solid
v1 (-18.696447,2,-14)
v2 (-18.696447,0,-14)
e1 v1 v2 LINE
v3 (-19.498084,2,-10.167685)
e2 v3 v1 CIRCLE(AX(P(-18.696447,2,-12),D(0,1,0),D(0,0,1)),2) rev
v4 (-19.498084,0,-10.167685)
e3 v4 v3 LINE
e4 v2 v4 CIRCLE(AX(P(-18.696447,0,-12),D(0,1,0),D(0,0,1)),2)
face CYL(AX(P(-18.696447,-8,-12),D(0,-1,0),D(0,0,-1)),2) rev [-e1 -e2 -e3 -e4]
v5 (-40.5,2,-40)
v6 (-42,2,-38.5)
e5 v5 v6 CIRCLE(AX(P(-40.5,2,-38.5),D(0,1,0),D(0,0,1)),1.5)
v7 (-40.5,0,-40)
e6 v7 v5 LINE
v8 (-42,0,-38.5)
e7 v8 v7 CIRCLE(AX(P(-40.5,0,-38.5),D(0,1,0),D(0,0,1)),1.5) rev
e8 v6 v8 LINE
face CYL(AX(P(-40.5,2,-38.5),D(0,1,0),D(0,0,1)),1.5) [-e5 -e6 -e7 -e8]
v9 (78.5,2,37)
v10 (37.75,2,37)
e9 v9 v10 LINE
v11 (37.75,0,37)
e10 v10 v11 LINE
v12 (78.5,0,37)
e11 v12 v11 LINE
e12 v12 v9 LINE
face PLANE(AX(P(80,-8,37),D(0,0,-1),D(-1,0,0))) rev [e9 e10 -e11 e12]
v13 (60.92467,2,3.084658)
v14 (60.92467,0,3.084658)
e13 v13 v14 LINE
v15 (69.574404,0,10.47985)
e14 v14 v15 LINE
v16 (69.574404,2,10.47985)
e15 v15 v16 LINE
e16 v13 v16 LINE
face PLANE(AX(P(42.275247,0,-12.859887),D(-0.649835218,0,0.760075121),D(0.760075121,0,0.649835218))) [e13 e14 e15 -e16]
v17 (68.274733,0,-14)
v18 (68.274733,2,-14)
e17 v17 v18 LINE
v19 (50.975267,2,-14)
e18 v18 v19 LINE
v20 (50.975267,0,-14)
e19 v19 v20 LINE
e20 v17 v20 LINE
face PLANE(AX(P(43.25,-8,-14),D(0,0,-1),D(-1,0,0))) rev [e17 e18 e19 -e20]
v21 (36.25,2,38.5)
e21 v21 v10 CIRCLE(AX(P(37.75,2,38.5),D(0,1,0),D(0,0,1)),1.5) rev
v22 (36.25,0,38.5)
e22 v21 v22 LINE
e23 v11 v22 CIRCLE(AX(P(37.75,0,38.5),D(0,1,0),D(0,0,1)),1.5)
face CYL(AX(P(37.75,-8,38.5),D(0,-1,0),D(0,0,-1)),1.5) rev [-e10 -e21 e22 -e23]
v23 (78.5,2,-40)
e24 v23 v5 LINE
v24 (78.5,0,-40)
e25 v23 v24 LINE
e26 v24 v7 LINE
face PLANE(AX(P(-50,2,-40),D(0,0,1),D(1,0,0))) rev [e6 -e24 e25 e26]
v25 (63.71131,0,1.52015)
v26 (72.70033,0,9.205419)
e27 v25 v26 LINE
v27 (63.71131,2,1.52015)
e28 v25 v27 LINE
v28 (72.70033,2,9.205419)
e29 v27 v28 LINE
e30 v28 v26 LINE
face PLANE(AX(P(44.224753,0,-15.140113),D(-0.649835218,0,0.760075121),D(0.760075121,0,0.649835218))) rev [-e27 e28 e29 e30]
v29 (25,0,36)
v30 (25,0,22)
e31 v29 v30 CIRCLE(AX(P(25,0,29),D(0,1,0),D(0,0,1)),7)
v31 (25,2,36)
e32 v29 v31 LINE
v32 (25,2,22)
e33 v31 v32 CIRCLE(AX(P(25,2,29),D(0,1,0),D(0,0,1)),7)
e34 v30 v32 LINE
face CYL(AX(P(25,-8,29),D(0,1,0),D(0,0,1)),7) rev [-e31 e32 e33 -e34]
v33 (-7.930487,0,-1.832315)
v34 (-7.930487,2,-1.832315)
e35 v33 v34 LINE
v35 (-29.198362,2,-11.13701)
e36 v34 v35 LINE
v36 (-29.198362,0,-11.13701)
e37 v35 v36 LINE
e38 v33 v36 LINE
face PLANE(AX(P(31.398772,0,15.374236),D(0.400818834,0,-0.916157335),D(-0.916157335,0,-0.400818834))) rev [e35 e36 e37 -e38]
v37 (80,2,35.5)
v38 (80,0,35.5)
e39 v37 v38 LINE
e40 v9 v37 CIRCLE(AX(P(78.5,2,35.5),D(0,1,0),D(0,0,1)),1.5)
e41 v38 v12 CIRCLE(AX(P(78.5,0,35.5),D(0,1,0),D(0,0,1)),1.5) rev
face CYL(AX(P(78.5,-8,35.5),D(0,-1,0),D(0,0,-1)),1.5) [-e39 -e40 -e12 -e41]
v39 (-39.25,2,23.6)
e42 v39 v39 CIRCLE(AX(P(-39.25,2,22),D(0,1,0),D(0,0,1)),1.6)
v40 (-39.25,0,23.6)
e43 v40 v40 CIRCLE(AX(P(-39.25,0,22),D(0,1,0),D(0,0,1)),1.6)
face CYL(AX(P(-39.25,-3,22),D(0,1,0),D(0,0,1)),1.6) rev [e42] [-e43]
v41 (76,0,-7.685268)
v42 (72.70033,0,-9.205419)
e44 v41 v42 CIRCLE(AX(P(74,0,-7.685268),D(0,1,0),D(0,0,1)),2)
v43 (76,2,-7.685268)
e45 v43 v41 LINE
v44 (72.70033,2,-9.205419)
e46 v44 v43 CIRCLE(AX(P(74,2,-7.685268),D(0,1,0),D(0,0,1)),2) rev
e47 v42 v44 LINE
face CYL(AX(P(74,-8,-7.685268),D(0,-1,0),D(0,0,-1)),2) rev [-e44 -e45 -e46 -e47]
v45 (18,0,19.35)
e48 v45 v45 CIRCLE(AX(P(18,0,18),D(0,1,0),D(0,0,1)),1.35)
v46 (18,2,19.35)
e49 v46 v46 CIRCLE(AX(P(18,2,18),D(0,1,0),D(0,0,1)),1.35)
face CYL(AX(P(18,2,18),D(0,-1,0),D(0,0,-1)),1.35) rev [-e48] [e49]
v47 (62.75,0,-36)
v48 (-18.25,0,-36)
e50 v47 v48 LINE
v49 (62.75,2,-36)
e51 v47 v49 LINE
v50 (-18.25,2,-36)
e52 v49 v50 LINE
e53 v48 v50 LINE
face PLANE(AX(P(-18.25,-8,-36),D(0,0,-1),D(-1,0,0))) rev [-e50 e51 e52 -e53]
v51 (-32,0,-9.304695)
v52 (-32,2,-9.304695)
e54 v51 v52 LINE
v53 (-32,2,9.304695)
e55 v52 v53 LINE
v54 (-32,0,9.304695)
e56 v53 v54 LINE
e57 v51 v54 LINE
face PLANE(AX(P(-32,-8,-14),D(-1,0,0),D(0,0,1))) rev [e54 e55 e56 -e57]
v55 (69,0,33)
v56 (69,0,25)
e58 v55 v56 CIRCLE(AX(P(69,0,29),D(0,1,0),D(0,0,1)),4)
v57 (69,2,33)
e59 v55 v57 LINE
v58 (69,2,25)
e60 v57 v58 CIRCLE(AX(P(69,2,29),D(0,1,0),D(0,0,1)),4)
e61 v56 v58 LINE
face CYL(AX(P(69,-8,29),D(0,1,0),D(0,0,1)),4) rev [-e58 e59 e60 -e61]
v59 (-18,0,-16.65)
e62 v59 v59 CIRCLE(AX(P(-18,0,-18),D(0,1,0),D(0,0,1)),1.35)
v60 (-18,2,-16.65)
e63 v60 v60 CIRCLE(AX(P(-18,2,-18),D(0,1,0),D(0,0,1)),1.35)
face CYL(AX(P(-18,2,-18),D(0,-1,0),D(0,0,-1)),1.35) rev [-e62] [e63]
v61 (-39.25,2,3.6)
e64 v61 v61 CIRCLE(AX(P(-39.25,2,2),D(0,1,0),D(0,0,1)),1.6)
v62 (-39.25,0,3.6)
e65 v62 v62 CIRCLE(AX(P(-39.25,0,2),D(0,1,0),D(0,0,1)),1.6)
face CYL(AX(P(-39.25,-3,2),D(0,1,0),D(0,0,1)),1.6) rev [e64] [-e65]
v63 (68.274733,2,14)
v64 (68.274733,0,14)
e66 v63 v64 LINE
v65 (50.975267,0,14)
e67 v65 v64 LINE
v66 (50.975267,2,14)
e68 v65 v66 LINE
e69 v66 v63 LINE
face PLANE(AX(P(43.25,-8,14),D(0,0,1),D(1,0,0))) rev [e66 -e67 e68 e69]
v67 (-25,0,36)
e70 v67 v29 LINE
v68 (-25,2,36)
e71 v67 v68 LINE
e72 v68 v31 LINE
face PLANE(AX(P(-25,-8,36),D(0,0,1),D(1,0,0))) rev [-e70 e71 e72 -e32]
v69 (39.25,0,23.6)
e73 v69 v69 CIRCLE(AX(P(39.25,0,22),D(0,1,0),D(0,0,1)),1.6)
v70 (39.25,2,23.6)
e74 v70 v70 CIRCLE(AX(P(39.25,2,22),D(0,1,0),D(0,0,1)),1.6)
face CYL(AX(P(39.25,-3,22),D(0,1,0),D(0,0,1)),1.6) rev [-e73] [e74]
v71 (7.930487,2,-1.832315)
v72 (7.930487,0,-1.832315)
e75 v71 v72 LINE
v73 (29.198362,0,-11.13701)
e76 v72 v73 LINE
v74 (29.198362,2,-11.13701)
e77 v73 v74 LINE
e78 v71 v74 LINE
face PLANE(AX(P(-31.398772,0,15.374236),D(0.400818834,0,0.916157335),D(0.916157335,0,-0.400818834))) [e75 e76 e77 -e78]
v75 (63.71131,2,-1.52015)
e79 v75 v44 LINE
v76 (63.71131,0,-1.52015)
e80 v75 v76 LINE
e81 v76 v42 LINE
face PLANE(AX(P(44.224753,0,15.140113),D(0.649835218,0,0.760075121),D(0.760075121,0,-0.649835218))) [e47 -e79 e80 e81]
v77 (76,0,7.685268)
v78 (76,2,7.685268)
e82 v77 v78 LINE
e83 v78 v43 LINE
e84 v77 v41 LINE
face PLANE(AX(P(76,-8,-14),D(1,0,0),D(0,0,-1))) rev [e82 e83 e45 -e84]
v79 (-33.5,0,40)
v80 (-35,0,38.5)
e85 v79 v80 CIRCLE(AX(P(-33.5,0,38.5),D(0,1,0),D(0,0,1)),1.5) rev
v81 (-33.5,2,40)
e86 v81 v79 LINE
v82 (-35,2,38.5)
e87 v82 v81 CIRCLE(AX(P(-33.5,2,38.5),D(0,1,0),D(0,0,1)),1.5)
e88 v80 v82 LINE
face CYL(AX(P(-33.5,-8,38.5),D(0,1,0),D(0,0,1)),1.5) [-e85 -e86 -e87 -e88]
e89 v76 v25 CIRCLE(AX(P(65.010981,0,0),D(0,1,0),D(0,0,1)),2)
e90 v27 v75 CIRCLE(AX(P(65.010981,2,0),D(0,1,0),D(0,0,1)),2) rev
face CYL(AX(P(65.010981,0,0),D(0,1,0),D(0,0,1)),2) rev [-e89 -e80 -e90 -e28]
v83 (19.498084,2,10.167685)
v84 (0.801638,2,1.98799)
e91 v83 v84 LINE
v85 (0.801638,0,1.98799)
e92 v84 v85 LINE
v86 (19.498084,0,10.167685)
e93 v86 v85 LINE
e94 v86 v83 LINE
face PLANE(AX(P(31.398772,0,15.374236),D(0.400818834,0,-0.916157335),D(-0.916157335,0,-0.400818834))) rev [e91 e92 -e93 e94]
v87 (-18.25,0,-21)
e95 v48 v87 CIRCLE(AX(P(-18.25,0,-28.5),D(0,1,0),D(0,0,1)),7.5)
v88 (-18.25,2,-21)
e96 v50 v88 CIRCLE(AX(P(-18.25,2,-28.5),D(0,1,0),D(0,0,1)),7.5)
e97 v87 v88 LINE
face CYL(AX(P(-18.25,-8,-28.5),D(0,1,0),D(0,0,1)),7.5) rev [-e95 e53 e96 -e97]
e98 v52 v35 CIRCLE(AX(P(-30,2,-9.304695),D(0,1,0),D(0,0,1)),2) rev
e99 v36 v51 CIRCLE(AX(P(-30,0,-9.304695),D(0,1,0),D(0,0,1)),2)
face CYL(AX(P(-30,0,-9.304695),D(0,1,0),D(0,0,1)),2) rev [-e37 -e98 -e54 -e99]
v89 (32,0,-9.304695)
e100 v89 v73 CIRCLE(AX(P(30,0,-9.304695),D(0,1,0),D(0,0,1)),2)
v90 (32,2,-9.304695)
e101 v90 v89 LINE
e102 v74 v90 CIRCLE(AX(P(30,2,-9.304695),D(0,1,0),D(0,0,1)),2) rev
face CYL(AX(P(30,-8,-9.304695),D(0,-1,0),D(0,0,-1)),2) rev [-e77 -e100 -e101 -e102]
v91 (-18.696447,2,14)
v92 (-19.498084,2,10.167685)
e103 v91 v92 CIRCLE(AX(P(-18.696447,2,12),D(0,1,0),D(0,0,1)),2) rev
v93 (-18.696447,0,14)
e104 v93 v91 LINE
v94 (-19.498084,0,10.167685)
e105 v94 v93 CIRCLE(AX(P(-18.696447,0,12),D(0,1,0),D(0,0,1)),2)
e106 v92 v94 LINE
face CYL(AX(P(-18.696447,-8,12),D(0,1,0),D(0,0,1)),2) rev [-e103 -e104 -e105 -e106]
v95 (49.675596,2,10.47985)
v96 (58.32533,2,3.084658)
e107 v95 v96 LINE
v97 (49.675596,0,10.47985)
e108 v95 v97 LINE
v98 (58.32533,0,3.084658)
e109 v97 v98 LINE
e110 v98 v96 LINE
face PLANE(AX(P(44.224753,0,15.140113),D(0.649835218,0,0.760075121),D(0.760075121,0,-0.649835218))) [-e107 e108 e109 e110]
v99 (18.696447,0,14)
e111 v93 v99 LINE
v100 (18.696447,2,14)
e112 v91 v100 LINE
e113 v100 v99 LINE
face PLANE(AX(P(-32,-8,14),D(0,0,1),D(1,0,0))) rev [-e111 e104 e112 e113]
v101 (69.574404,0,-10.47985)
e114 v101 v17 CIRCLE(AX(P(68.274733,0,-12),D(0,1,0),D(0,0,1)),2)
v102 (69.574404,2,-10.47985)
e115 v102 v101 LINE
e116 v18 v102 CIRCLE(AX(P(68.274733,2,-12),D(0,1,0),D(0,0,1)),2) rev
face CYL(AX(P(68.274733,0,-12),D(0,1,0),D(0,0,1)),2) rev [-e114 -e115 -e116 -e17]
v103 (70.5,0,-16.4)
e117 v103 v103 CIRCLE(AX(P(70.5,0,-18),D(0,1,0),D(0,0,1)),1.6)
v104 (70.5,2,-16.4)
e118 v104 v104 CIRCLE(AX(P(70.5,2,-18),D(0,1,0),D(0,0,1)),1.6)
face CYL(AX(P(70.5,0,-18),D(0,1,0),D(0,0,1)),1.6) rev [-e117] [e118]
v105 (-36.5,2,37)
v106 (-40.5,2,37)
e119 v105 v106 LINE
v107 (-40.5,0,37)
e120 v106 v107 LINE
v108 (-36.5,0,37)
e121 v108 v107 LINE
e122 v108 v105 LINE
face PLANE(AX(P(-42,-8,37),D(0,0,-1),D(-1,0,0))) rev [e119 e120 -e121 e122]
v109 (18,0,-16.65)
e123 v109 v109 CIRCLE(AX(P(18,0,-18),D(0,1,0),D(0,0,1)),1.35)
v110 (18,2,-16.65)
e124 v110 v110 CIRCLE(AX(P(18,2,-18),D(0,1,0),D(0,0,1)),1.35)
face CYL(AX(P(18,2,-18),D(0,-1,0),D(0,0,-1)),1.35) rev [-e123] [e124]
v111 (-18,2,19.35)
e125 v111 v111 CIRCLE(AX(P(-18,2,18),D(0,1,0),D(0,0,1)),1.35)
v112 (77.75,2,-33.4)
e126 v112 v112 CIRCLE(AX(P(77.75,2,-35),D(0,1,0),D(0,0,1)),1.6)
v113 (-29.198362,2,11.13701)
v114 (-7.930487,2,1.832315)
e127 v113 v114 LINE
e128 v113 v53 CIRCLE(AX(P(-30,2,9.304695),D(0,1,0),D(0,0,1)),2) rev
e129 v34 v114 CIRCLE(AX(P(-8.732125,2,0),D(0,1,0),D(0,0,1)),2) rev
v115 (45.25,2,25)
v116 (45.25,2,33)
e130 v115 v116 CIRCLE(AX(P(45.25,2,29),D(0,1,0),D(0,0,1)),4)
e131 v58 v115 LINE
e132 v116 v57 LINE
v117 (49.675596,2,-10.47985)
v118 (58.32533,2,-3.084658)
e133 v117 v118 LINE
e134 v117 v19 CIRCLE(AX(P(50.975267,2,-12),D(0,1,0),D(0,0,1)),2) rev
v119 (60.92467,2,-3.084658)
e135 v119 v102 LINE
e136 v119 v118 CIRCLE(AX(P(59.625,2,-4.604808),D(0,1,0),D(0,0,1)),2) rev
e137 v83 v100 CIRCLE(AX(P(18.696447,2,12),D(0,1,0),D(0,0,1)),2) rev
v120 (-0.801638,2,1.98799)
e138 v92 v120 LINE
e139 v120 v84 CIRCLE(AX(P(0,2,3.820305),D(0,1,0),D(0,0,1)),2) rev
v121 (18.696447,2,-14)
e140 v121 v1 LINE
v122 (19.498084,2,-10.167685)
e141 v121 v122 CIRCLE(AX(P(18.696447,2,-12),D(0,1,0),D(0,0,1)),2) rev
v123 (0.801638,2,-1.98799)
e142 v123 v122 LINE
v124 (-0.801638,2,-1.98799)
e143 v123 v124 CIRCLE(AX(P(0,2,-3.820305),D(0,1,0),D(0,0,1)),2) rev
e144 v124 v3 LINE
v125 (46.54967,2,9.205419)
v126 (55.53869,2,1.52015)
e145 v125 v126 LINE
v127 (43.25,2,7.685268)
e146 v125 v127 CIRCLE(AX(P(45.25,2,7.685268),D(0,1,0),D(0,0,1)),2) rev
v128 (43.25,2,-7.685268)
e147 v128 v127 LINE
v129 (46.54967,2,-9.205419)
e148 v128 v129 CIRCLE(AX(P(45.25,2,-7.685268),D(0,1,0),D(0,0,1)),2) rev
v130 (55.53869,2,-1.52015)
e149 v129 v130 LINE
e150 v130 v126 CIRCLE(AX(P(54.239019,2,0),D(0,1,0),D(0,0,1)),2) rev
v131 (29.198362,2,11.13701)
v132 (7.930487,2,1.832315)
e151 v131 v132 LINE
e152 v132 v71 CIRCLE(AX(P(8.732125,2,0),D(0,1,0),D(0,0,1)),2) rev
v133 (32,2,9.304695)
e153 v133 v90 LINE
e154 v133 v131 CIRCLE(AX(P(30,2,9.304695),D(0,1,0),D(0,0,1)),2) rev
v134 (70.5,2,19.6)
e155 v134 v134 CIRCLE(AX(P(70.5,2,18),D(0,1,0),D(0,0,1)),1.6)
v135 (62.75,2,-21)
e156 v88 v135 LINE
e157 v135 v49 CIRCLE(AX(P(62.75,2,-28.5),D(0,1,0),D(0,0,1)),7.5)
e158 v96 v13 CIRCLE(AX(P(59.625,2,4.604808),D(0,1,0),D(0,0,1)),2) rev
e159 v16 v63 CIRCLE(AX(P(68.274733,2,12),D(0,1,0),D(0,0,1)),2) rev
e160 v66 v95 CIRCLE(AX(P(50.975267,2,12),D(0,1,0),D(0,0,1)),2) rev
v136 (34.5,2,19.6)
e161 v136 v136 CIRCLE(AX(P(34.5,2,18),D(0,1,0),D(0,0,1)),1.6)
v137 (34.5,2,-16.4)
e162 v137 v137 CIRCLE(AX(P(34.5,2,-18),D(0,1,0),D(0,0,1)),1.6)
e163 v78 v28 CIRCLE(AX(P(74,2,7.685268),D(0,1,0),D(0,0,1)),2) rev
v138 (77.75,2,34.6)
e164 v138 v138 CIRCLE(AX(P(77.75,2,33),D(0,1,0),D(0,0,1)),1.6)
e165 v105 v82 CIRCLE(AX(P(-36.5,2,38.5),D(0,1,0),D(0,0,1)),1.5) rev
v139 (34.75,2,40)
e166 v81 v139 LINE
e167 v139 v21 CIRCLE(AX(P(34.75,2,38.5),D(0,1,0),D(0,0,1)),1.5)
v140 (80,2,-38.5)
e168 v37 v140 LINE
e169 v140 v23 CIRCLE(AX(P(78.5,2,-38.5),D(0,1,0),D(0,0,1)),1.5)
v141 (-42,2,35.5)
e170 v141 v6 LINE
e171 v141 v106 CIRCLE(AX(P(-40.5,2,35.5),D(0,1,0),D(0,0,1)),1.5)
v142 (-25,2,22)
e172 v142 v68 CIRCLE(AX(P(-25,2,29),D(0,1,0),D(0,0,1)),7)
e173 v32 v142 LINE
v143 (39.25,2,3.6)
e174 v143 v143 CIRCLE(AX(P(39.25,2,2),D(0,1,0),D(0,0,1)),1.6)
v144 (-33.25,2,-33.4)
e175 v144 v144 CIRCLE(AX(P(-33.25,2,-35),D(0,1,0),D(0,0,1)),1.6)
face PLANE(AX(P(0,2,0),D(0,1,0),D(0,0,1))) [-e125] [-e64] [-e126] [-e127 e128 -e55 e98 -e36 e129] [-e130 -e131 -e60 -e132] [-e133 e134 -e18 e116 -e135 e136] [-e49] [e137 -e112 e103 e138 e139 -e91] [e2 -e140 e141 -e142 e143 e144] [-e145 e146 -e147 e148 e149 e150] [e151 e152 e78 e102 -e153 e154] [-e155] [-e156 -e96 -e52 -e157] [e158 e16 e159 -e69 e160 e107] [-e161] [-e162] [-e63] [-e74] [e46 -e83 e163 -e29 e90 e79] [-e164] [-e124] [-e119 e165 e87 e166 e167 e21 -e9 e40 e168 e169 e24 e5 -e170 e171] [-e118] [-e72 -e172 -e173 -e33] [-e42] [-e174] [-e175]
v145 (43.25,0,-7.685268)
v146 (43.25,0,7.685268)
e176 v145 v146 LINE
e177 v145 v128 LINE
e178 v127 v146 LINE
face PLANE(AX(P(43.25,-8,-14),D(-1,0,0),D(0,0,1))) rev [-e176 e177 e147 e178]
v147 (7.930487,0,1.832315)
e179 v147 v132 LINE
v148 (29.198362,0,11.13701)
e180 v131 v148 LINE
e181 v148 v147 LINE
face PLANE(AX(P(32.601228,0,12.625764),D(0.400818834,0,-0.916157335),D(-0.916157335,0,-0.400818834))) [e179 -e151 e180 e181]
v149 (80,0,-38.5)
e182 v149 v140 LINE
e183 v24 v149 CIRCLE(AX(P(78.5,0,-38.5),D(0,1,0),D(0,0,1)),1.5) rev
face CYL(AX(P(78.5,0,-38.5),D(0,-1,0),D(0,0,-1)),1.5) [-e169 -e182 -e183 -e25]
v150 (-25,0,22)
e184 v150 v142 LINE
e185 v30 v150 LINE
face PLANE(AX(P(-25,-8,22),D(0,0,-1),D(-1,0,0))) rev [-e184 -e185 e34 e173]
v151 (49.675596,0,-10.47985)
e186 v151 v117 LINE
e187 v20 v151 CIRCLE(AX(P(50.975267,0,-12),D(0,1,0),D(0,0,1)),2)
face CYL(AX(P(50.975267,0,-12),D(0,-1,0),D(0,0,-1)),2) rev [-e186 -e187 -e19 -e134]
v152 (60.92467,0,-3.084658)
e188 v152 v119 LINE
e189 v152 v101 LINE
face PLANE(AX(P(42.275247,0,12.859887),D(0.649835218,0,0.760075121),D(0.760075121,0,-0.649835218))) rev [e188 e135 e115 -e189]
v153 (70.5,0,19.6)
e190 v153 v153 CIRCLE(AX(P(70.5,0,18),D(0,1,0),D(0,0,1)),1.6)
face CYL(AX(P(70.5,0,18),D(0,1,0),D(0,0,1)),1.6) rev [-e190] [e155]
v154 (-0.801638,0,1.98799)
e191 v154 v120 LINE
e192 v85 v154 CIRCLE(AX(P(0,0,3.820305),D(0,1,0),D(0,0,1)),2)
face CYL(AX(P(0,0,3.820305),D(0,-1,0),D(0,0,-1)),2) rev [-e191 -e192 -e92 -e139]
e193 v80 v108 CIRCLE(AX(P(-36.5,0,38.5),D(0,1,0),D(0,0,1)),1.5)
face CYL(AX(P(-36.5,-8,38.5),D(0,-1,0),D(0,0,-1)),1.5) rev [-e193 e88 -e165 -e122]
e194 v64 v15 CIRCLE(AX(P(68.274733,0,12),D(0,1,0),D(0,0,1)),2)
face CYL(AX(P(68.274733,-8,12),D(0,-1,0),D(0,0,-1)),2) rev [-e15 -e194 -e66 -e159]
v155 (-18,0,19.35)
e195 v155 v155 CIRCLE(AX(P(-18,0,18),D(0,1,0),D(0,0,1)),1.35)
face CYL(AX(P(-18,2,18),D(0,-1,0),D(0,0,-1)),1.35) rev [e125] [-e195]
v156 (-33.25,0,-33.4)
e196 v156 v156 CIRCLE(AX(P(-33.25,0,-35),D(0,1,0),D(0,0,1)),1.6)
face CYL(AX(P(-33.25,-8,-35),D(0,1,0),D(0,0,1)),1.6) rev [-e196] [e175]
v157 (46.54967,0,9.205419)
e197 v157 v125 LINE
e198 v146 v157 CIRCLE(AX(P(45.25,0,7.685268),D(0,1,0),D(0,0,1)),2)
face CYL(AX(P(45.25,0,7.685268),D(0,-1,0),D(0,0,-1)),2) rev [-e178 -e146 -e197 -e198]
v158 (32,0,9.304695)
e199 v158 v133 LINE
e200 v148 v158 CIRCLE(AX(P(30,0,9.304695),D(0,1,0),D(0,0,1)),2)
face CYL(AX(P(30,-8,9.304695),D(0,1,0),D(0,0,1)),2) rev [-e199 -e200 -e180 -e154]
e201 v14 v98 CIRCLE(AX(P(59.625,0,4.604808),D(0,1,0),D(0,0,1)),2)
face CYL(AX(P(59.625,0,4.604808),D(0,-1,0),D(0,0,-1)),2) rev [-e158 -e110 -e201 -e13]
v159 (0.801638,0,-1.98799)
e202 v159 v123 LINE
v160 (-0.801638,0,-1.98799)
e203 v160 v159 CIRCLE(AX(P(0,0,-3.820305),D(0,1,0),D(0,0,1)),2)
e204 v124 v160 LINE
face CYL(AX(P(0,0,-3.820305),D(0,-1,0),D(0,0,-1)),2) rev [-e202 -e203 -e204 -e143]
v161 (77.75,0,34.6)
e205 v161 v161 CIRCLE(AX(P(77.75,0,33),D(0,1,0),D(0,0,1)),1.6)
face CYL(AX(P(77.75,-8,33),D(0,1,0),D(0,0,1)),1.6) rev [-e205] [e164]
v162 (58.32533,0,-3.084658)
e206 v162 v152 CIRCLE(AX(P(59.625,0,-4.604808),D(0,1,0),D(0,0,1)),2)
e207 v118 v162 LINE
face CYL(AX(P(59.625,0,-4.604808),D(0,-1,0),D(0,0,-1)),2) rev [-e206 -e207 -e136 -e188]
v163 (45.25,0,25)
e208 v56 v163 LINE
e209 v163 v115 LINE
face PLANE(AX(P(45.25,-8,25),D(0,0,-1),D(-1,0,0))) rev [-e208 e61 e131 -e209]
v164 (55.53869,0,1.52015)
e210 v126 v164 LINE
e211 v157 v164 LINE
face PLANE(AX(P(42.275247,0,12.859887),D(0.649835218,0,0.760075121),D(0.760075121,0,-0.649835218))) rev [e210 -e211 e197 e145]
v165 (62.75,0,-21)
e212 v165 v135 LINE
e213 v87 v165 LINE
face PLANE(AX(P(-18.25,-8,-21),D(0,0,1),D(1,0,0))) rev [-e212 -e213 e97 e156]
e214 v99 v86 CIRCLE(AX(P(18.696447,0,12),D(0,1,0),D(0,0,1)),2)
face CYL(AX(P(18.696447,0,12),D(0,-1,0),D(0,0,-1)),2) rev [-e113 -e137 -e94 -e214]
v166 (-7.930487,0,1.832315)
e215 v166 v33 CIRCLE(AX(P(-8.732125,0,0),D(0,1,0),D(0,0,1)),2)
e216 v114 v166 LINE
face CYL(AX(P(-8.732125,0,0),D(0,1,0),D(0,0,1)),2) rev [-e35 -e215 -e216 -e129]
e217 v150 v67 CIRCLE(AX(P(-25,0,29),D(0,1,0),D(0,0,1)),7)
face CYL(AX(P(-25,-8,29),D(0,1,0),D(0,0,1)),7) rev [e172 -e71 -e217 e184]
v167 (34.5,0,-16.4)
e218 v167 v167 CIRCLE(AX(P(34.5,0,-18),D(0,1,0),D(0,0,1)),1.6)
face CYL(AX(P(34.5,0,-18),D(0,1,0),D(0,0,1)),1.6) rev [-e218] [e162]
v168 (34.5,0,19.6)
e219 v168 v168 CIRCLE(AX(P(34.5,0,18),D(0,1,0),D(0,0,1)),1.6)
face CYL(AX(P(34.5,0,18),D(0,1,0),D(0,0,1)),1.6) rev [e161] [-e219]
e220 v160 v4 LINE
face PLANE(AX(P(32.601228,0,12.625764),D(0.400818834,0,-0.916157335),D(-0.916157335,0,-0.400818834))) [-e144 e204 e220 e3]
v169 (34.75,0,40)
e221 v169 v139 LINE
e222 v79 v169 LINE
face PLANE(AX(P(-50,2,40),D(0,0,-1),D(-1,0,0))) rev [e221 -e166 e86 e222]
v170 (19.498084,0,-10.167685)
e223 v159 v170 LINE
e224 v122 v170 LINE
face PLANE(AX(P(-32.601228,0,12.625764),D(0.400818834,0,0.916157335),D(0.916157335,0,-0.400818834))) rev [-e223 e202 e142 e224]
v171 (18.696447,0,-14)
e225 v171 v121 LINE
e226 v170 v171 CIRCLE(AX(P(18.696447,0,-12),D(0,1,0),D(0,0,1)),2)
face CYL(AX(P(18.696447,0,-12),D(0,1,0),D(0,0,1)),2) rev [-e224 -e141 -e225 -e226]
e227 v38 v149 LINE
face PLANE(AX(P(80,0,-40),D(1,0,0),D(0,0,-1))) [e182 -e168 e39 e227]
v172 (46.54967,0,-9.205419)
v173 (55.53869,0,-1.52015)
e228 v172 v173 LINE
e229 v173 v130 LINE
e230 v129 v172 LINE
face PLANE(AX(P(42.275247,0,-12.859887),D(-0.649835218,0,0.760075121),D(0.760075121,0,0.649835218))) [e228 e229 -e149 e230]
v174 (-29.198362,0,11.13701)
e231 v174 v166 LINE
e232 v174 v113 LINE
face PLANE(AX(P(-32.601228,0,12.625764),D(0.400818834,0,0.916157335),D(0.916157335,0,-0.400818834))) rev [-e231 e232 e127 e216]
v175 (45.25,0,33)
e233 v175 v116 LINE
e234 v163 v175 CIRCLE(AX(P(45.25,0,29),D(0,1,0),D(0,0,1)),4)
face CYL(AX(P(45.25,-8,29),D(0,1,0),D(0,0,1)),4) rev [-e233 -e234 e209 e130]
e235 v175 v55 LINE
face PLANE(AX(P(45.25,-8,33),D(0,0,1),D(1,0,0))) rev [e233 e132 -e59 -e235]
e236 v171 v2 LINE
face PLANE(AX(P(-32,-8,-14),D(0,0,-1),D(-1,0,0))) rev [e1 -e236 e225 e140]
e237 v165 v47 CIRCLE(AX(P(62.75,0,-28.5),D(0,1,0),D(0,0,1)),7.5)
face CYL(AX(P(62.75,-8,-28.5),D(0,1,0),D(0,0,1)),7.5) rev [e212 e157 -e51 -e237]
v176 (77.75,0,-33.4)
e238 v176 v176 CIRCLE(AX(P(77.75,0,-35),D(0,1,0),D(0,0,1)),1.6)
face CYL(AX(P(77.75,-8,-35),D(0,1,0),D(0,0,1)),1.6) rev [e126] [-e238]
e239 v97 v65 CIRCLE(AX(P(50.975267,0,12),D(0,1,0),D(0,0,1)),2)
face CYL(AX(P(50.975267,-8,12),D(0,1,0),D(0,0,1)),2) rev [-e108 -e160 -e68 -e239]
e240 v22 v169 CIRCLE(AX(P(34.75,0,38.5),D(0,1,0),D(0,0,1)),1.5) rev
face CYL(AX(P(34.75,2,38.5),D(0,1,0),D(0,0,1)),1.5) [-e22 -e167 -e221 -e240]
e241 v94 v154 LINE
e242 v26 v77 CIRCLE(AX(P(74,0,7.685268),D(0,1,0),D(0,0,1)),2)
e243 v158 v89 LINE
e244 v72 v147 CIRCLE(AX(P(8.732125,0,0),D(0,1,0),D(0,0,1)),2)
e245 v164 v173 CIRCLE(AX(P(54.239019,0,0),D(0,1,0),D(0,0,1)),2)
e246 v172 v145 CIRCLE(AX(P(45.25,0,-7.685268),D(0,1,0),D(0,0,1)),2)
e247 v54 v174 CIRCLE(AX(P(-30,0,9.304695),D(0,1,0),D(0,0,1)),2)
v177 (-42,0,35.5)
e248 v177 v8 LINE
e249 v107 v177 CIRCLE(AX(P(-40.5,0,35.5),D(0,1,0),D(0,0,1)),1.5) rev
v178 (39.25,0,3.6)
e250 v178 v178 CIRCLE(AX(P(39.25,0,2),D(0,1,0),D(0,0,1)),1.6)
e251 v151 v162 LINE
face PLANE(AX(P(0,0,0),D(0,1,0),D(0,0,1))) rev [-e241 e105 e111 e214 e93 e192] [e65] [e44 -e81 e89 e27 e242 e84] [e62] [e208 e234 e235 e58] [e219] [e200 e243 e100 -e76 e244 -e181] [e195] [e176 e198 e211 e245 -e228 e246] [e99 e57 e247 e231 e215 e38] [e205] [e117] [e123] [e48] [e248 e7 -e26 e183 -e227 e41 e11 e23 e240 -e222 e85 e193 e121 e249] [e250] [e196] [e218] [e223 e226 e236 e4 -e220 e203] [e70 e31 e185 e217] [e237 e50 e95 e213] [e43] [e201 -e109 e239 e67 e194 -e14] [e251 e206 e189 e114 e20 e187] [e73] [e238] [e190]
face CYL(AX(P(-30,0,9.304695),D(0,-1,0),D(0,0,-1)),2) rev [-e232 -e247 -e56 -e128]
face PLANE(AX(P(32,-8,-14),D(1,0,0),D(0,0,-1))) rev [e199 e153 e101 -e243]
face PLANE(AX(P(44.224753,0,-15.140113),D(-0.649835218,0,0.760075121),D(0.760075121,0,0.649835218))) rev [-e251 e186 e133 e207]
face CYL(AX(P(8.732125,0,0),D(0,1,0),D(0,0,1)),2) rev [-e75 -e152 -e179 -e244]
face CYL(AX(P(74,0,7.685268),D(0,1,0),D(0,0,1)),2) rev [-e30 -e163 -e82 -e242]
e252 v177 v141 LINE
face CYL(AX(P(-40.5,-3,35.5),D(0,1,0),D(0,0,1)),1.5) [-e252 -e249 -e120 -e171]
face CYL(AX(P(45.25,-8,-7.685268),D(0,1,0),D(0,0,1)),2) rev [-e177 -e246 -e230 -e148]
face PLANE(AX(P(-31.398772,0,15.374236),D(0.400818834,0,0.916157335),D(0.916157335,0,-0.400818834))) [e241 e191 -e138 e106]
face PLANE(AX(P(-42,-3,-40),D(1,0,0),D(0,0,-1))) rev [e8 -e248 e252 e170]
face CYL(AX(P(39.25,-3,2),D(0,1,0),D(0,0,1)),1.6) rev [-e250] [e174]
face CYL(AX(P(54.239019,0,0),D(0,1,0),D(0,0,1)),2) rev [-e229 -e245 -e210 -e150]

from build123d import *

# Parameters (mm, degrees)
SKETCH_1_W          = 100
SKETCH_1_H          = 80
SKETCH_1_R          = 1.35
EXTRUDE_1_DEPTH     = 2
SKETCH_2_W          = 8
SKETCH_2_H          = 80
CUT_EXTRUDE_1_DEPTH = 5
SKETCH_3_R          = 1.6
CUT_EXTRUDE_2_DEPTH = 5
SKETCH_4_W          = 30
SKETCH_4_H          = 80
EXTRUDE_2_DEPTH     = 2
SKETCH_5_R          = 1.6
CUT_EXTRUDE_3_DEPTH = 2
SKETCH_6_W          = 43.75
SKETCH_6_H          = 3
SKETCH_6_W_2        = 7
CUT_EXTRUDE_4_DEPTH = 10
SKETCH_8_R          = 1.6
CUT_EXTRUDE_5_DEPTH = 10
SKETCH_7_W          = 64
SKETCH_7_H          = 28
SKETCH_7_W_2        = 32.75
CUT_EXTRUDE_6_DEPTH = 10
EXTRUDE_1_2_DEPTH   = 2
FILLET_1_R          = 2
FILLET_2_R          = 1.5


with BuildPart() as part:
    # 草图1 → Extrude 1 (new body)
    with BuildSketch(Plane(origin=(0, 0, 0), x_dir=(1, 0, 0), z_dir=(0, 1, 0))):
        Rectangle(SKETCH_1_W, SKETCH_1_H)
        with Locations(Location((18, -18, 0), (0, 0, 270))):
            Circle(SKETCH_1_R, mode=Mode.SUBTRACT)
        with Locations(Location((-18, -18, 0), (0, 0, 270))):
            Circle(SKETCH_1_R, mode=Mode.SUBTRACT)
        with Locations(Location((-18, 18, 0), (0, 0, 270))):
            Circle(SKETCH_1_R, mode=Mode.SUBTRACT)
        with Locations(Location((18, 18, 0), (0, 0, 270))):
            Circle(SKETCH_1_R, mode=Mode.SUBTRACT)
    extrude(amount=EXTRUDE_1_DEPTH)

    # 草图2 → 切除-拉伸1 (cut)
    with BuildSketch(Plane(origin=(0, 2, 0), x_dir=(1, 0, 0), z_dir=(0, 1, 0))):
        with Locations((-46, 0)):
            Rectangle(SKETCH_2_W, SKETCH_2_H)
    extrude(amount=-CUT_EXTRUDE_1_DEPTH, mode=Mode.SUBTRACT)

    # 草图3 → 切除-拉伸2 (cut)
    with BuildSketch(Plane(origin=(0, 2, 0), x_dir=(1, 0, 0), z_dir=(0, 1, 0))):
        with Locations(Location((-39.25, -22, 0), (0, 0, 270))):
            Circle(SKETCH_3_R)
        with Locations(Location((-39.25, -2, 0), (0, 0, 270))):
            Circle(SKETCH_3_R)
        with Locations(Location((39.25, -22, 0), (0, 0, 270))):
            Circle(SKETCH_3_R)
        with Locations(Location((39.25, -2, 0), (0, 0, 270))):
            Circle(SKETCH_3_R)
    extrude(amount=-CUT_EXTRUDE_2_DEPTH, mode=Mode.SUBTRACT)

    # 草图4 → 凸台-拉伸2 (add)
    with BuildSketch(Plane(origin=(0, 2, 0), x_dir=(1, 0, 0), z_dir=(0, 1, 0))):
        with Locations((65, 0)):
            Rectangle(SKETCH_4_W, SKETCH_4_H)
    extrude(amount=-EXTRUDE_2_DEPTH)

    # 草图5 → 切除-拉伸3 (cut)
    with BuildSketch(Plane(origin=(0, 2, 0), x_dir=(1, 0, 0), z_dir=(0, 1, 0))):
        with Locations(Location((34.5, -18, 0), (0, 0, 270))):
            Circle(SKETCH_5_R)
        with Locations(Location((70.5, -18, 0), (0, 0, 270))):
            Circle(SKETCH_5_R)
        with Locations(Location((70.5, 18, 0), (0, 0, 270))):
            Circle(SKETCH_5_R)
        with Locations(Location((34.5, 18, 0), (0, 0, 270))):
            Circle(SKETCH_5_R)
    extrude(amount=-CUT_EXTRUDE_3_DEPTH, mode=Mode.SUBTRACT)

    # 草图6 → 切除-拉伸4 (cut)
    with BuildSketch(Plane(origin=(0, 2, 0), x_dir=(1, 0, 0), z_dir=(0, 1, 0))):
        with Locations((58.125, -38.5)):
            Rectangle(SKETCH_6_W, SKETCH_6_H)
        with Locations((-38.5, -38.5)):
            Rectangle(SKETCH_6_W_2, SKETCH_6_H)
    extrude(amount=-CUT_EXTRUDE_4_DEPTH, mode=Mode.SUBTRACT)

    # 草图8 → 切除-拉伸5 (cut)
    with BuildSketch(Plane(origin=(0, 2, 0), x_dir=(1, 0, 0), z_dir=(0, 1, 0))):
        with Locations(Location((77.75, -33, 0), (0, 0, 270))):
            Circle(SKETCH_8_R)
        with Locations(Location((77.75, 35, 0), (0, 0, 270))):
            Circle(SKETCH_8_R)
        with Locations(Location((-33.25, 35, 0), (0, 0, 270))):
            Circle(SKETCH_8_R)
    extrude(amount=-CUT_EXTRUDE_5_DEPTH, mode=Mode.SUBTRACT)

    # 草图7 → 切除-拉伸6 (cut)
    with BuildSketch(Plane(origin=(0, 2, 0), x_dir=(1, 0, 0), z_dir=(0, 1, 0))):
        with BuildLine():
            Line((-25, -22), (25, -22))
            ThreePointArc((25, -22), (32, -29), (25, -36))
            Line((25, -36), (-25, -36))
            ThreePointArc((-25, -36), (-32, -29), (-25, -22))
        make_face()
        with BuildLine():
            Line((45.25, -25), (69, -25))
            ThreePointArc((69, -25), (73, -29), (69, -33))
            Line((69, -33), (45.25, -33))
            ThreePointArc((45.25, -33), (41.25, -29), (45.25, -25))
        make_face()
        Rectangle(SKETCH_7_W, SKETCH_7_H)
        with Locations((59.625, 0)):
            Rectangle(SKETCH_7_W_2, SKETCH_7_H)
        with BuildLine():
            Line((-18.25, 36), (62.75, 36))
            ThreePointArc((62.75, 36), (70.25, 28.5), (62.75, 21))
            Line((62.75, 21), (-18.25, 21))
            ThreePointArc((-18.25, 21), (-25.75, 28.5), (-18.25, 36))
        make_face()
    extrude(amount=-CUT_EXTRUDE_6_DEPTH, mode=Mode.SUBTRACT)

    # 草图9 → Extrude 1 2 (add)
    with BuildSketch(Plane(origin=(0, 2, 0), x_dir=(1, 0, 0), z_dir=(0, 1, 0))):
        Polygon((32.601228251, -12.625763998), (-31.398771749, 15.374236002), (-32.601228251, 12.625763998), (31.398771749, -15.374236002), align=None)
        Polygon((-31.398771749, -15.374236002), (32.601228251, 12.625763998), (31.398771749, 15.374236002), (-32.601228251, -12.625763998), align=None)
        Polygon((42.275247173, 12.859887319), (75.025247173, -15.140112681), (76.974752827, -12.859887319), (44.224752827, 15.140112681), align=None)
        Polygon((44.224752827, -15.140112681), (76.974752827, 12.859887319), (75.025247173, 15.140112681), (42.275247173, -12.859887319), align=None)
    extrude(amount=-EXTRUDE_1_2_DEPTH)

    # 圆角1
    fillet_1_edges = [part.edges().sort_by_distance(p)[0] for p in [
        (28.257660886, 1, -14),
        (-28.257660886, 1, -14),
        (-32, 1, 12.362726638),
        (-32, 1, -12.362726638),
        (-28.257660886, 1, 14),
        (28.257660886, 1, 14),
        (32, 1, -12.362726638),
        (32, 1, 12.362726638),
        (3.742339114, 1, 0),
        (0, 1, 1.637273362),
        (-3.742339114, 1, 0),
        (0, 1, -1.637273362),
        (45.558277481, 1, 14),
        (73.691722519, 1, 14),
        (76, 1, -12.026510856),
        (76, 1, 12.026510856),
        (73.691722519, 1, -14),
        (45.558277481, 1, -14),
        (43.25, 1, 12.026510856),
        (43.25, 1, -12.026510856),
        (57.316722519, 1, 0),
        (59.625, 1, -1.973489144),
        (61.933277481, 1, 0),
        (59.625, 1, 1.973489144),
    ]]
    fillet(fillet_1_edges, radius=FILLET_1_R)

    # 圆角2
    fillet_2_edges = [part.edges().sort_by_distance(p)[0] for p in [
        (80, 1, 37),
        (80, 1, -40),
        (-42, 1, -40),
        (-42, 1, 37),
        (-35, 1, 37),
        (-35, 1, 40),
        (36.25, 1, 37),
        (36.25, 1, 40),
    ]]
    fillet(fillet_2_edges, radius=FILLET_2_R - 0.0001)  # a hair under: the kernel refuses the full size


solid = part.part
